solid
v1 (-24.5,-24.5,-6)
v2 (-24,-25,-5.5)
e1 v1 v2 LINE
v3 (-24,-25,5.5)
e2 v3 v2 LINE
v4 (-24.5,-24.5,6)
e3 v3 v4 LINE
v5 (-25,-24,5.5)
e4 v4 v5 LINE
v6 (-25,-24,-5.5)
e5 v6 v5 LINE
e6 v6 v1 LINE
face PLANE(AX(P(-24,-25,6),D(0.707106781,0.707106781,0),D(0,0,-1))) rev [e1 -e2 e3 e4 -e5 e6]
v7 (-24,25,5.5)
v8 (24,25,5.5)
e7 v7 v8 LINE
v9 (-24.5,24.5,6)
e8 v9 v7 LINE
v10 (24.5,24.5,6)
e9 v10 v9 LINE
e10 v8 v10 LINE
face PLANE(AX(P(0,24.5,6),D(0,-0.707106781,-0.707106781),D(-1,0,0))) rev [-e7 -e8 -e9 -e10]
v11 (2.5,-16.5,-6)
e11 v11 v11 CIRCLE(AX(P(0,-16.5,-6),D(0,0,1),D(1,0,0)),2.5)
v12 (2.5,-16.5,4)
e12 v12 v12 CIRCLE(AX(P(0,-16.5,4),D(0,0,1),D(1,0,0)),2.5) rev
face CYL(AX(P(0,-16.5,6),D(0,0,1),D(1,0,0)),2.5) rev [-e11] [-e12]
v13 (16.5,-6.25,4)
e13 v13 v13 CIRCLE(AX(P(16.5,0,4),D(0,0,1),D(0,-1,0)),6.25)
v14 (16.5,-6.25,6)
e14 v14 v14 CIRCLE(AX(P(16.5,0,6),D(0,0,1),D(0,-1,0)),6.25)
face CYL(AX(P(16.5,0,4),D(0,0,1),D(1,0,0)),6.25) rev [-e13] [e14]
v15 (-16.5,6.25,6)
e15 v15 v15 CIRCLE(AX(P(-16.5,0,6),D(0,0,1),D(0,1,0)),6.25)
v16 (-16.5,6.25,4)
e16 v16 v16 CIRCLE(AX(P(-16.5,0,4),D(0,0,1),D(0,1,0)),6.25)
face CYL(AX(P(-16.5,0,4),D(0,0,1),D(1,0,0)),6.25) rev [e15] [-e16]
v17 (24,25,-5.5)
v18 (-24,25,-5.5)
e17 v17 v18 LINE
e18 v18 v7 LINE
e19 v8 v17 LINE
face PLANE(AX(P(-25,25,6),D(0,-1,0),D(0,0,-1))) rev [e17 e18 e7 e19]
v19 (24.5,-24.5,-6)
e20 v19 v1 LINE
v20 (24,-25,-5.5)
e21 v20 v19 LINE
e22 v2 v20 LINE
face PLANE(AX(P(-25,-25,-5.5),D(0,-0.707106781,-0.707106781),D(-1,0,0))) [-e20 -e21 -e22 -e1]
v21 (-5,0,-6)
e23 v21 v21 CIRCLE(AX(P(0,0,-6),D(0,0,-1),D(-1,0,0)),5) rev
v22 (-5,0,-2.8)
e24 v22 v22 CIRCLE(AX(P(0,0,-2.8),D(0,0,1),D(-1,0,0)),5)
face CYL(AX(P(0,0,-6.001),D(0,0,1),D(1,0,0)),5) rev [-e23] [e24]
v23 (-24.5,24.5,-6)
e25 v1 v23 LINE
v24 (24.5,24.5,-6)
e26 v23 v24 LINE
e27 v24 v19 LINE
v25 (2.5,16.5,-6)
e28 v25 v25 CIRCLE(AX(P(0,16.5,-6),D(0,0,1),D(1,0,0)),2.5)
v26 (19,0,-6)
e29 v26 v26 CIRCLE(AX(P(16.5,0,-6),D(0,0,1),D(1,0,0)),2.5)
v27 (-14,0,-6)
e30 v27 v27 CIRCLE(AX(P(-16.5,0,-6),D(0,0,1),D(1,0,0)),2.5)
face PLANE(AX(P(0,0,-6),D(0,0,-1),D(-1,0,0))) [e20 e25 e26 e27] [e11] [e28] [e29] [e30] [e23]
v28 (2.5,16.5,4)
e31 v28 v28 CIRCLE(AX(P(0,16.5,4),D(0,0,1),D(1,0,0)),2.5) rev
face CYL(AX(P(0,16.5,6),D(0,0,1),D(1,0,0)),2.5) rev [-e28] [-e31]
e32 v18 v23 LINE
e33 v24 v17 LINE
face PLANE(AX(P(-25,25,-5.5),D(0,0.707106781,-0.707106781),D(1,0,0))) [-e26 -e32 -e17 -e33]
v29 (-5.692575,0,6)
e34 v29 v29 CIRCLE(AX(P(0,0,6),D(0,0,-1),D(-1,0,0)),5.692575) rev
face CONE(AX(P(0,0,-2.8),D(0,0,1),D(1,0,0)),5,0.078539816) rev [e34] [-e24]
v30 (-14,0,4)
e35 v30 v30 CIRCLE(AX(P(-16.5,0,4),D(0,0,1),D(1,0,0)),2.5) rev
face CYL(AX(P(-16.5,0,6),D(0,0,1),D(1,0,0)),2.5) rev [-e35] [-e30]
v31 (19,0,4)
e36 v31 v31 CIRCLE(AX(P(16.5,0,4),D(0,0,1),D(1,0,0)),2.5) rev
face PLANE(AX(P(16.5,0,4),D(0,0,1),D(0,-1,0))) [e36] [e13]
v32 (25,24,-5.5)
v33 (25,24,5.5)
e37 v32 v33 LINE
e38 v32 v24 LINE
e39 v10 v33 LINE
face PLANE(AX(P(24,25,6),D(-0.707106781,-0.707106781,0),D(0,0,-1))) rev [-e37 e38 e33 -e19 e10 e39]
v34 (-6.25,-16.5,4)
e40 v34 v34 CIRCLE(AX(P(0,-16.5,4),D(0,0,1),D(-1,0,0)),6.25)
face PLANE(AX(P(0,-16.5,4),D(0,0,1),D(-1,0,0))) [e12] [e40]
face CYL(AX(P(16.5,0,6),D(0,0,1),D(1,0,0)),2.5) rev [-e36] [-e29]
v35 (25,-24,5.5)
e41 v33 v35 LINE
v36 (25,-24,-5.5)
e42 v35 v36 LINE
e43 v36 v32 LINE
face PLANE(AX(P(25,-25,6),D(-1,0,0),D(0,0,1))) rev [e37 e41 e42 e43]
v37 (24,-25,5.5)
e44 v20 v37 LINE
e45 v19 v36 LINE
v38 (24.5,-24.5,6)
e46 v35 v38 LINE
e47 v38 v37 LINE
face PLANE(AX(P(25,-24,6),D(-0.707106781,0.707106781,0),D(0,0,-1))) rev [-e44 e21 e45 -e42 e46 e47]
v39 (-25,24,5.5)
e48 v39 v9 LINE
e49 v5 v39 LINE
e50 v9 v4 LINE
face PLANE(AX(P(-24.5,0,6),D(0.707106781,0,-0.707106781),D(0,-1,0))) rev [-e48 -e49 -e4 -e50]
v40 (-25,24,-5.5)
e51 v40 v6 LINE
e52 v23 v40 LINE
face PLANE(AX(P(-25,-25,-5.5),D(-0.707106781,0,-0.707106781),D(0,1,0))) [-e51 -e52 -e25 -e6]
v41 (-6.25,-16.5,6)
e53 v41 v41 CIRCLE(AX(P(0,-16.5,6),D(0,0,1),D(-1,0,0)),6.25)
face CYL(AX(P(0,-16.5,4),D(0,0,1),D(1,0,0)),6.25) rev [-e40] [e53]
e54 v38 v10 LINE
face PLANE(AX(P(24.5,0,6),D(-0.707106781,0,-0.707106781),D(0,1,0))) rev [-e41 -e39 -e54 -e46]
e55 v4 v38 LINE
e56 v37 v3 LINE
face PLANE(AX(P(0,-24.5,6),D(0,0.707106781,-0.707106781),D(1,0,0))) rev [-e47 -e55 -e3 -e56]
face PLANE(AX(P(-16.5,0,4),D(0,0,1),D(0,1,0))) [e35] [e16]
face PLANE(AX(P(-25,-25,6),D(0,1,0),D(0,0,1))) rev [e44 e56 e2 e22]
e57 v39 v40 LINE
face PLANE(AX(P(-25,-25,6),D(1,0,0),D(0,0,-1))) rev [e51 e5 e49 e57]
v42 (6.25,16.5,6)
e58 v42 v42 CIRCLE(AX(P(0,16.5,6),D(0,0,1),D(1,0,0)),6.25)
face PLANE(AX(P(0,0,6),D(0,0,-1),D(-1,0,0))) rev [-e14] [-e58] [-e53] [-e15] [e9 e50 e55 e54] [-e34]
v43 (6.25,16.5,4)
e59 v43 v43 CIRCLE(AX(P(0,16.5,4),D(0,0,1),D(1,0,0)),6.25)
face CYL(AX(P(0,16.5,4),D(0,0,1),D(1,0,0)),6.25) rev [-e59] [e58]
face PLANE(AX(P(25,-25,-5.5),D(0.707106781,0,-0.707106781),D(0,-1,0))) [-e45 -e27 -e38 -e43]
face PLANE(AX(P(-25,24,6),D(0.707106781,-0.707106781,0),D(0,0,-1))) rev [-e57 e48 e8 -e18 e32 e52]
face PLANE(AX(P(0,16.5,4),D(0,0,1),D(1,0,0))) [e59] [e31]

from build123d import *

# Parameters (mm, degrees)
SKETCH1_W           = 50
SKETCH1_H           = 50
BOSS_EXTRUDE1_DEPTH = 6
CUT_EXTRUDE1_REACH  = 39.336
SKETCH5_R           = 5
CHAMFER1_SIZE       = 1
CHAMFER2_SIZE       = 0.5
M6_TAPPED_HOLE1_D   = 5
SKETCH10_R          = 6.25
CUT_EXTRUDE2_DEPTH  = 2
CIRPATTERN1_COUNT   = 4


# Read off the part's stored shape, not the designer's step: Draft1
with BuildPart() as part:
    # Sketch1 → Boss-Extrude1 (new, symmetric)
    with BuildSketch(Plane.XY):
        Rectangle(SKETCH1_W, SKETCH1_H)
    extrude(amount=BOSS_EXTRUDE1_DEPTH, both=True)

    # Sketch5 → Cut-Extrude1 (cut, up to next)
    with BuildSketch(Plane.XY.offset(6), mode=Mode.PRIVATE) as cut_extrude1_sk1:
        Circle(SKETCH5_R)
    cut_extrude1_tool1 = extrude(cut_extrude1_sk1.sketch, amount=-CUT_EXTRUDE1_REACH, mode=Mode.PRIVATE) & part.part
    add(cut_extrude1_tool1.solids().sort_by_distance((0, 0, 6))[0], mode=Mode.SUBTRACT)

    # Chamfer1
    chamfer1_edges = [part.edges().sort_by_distance(p)[0] for p in [
        (25, -25, 0),
        (-25, -25, 0),
        (-25, 25, 0),
        (25, 25, 0),
    ]]
    chamfer(chamfer1_edges, length=CHAMFER1_SIZE)

    # Chamfer2
    chamfer2_edges = [part.edges().sort_by_distance(p)[0] for p in [
        (0, -25, 6),
        (0, -25, -6),
        (0, 25, -6),
        (0, 25, 6),
        (25, 0, -6),
        (25, 0, 6),
        (-25, 0, -6),
        (-25, 0, 6),
    ]]
    chamfer(chamfer2_edges, length=CHAMFER2_SIZE - 0.0001)  # a hair under: the kernel refuses the full size

    # M6 Tapped Hole1 (through all)
    with Locations(Plane.XY.offset(6)):
        with Locations((-16.5, 0), (0, 16.5), (16.5, 0), (0, -16.5)):
            Hole(M6_TAPPED_HOLE1_D / 2)

    # Sketch10 → Cut-Extrude2 (cut)
    with BuildSketch(Plane.XY.offset(6)):
        with Locations((0, 16.5)):
            Circle(SKETCH10_R)
    cut_extrude2 = extrude(amount=-CUT_EXTRUDE2_DEPTH, mode=Mode.SUBTRACT)

    # CirPattern1: Cut-Extrude2 ×4 about axis
    cirpattern1_axis = Axis((0, 0, 0), (0, 0, 1))
    for i in range(1, CIRPATTERN1_COUNT):
        add(cut_extrude2.rotate(cirpattern1_axis, i * 360 / CIRPATTERN1_COUNT), mode=Mode.SUBTRACT)

    # Draft1 outline → Draft1 (revolve, cut)
    with BuildSketch(Plane.XZ):
        Polygon((5, 6), (5, -2.8), (5.69257502, 6), align=None)
    revolve(axis=Axis((0, 0, 0), (0, 0, 1)), mode=Mode.SUBTRACT)


solid = part.part
